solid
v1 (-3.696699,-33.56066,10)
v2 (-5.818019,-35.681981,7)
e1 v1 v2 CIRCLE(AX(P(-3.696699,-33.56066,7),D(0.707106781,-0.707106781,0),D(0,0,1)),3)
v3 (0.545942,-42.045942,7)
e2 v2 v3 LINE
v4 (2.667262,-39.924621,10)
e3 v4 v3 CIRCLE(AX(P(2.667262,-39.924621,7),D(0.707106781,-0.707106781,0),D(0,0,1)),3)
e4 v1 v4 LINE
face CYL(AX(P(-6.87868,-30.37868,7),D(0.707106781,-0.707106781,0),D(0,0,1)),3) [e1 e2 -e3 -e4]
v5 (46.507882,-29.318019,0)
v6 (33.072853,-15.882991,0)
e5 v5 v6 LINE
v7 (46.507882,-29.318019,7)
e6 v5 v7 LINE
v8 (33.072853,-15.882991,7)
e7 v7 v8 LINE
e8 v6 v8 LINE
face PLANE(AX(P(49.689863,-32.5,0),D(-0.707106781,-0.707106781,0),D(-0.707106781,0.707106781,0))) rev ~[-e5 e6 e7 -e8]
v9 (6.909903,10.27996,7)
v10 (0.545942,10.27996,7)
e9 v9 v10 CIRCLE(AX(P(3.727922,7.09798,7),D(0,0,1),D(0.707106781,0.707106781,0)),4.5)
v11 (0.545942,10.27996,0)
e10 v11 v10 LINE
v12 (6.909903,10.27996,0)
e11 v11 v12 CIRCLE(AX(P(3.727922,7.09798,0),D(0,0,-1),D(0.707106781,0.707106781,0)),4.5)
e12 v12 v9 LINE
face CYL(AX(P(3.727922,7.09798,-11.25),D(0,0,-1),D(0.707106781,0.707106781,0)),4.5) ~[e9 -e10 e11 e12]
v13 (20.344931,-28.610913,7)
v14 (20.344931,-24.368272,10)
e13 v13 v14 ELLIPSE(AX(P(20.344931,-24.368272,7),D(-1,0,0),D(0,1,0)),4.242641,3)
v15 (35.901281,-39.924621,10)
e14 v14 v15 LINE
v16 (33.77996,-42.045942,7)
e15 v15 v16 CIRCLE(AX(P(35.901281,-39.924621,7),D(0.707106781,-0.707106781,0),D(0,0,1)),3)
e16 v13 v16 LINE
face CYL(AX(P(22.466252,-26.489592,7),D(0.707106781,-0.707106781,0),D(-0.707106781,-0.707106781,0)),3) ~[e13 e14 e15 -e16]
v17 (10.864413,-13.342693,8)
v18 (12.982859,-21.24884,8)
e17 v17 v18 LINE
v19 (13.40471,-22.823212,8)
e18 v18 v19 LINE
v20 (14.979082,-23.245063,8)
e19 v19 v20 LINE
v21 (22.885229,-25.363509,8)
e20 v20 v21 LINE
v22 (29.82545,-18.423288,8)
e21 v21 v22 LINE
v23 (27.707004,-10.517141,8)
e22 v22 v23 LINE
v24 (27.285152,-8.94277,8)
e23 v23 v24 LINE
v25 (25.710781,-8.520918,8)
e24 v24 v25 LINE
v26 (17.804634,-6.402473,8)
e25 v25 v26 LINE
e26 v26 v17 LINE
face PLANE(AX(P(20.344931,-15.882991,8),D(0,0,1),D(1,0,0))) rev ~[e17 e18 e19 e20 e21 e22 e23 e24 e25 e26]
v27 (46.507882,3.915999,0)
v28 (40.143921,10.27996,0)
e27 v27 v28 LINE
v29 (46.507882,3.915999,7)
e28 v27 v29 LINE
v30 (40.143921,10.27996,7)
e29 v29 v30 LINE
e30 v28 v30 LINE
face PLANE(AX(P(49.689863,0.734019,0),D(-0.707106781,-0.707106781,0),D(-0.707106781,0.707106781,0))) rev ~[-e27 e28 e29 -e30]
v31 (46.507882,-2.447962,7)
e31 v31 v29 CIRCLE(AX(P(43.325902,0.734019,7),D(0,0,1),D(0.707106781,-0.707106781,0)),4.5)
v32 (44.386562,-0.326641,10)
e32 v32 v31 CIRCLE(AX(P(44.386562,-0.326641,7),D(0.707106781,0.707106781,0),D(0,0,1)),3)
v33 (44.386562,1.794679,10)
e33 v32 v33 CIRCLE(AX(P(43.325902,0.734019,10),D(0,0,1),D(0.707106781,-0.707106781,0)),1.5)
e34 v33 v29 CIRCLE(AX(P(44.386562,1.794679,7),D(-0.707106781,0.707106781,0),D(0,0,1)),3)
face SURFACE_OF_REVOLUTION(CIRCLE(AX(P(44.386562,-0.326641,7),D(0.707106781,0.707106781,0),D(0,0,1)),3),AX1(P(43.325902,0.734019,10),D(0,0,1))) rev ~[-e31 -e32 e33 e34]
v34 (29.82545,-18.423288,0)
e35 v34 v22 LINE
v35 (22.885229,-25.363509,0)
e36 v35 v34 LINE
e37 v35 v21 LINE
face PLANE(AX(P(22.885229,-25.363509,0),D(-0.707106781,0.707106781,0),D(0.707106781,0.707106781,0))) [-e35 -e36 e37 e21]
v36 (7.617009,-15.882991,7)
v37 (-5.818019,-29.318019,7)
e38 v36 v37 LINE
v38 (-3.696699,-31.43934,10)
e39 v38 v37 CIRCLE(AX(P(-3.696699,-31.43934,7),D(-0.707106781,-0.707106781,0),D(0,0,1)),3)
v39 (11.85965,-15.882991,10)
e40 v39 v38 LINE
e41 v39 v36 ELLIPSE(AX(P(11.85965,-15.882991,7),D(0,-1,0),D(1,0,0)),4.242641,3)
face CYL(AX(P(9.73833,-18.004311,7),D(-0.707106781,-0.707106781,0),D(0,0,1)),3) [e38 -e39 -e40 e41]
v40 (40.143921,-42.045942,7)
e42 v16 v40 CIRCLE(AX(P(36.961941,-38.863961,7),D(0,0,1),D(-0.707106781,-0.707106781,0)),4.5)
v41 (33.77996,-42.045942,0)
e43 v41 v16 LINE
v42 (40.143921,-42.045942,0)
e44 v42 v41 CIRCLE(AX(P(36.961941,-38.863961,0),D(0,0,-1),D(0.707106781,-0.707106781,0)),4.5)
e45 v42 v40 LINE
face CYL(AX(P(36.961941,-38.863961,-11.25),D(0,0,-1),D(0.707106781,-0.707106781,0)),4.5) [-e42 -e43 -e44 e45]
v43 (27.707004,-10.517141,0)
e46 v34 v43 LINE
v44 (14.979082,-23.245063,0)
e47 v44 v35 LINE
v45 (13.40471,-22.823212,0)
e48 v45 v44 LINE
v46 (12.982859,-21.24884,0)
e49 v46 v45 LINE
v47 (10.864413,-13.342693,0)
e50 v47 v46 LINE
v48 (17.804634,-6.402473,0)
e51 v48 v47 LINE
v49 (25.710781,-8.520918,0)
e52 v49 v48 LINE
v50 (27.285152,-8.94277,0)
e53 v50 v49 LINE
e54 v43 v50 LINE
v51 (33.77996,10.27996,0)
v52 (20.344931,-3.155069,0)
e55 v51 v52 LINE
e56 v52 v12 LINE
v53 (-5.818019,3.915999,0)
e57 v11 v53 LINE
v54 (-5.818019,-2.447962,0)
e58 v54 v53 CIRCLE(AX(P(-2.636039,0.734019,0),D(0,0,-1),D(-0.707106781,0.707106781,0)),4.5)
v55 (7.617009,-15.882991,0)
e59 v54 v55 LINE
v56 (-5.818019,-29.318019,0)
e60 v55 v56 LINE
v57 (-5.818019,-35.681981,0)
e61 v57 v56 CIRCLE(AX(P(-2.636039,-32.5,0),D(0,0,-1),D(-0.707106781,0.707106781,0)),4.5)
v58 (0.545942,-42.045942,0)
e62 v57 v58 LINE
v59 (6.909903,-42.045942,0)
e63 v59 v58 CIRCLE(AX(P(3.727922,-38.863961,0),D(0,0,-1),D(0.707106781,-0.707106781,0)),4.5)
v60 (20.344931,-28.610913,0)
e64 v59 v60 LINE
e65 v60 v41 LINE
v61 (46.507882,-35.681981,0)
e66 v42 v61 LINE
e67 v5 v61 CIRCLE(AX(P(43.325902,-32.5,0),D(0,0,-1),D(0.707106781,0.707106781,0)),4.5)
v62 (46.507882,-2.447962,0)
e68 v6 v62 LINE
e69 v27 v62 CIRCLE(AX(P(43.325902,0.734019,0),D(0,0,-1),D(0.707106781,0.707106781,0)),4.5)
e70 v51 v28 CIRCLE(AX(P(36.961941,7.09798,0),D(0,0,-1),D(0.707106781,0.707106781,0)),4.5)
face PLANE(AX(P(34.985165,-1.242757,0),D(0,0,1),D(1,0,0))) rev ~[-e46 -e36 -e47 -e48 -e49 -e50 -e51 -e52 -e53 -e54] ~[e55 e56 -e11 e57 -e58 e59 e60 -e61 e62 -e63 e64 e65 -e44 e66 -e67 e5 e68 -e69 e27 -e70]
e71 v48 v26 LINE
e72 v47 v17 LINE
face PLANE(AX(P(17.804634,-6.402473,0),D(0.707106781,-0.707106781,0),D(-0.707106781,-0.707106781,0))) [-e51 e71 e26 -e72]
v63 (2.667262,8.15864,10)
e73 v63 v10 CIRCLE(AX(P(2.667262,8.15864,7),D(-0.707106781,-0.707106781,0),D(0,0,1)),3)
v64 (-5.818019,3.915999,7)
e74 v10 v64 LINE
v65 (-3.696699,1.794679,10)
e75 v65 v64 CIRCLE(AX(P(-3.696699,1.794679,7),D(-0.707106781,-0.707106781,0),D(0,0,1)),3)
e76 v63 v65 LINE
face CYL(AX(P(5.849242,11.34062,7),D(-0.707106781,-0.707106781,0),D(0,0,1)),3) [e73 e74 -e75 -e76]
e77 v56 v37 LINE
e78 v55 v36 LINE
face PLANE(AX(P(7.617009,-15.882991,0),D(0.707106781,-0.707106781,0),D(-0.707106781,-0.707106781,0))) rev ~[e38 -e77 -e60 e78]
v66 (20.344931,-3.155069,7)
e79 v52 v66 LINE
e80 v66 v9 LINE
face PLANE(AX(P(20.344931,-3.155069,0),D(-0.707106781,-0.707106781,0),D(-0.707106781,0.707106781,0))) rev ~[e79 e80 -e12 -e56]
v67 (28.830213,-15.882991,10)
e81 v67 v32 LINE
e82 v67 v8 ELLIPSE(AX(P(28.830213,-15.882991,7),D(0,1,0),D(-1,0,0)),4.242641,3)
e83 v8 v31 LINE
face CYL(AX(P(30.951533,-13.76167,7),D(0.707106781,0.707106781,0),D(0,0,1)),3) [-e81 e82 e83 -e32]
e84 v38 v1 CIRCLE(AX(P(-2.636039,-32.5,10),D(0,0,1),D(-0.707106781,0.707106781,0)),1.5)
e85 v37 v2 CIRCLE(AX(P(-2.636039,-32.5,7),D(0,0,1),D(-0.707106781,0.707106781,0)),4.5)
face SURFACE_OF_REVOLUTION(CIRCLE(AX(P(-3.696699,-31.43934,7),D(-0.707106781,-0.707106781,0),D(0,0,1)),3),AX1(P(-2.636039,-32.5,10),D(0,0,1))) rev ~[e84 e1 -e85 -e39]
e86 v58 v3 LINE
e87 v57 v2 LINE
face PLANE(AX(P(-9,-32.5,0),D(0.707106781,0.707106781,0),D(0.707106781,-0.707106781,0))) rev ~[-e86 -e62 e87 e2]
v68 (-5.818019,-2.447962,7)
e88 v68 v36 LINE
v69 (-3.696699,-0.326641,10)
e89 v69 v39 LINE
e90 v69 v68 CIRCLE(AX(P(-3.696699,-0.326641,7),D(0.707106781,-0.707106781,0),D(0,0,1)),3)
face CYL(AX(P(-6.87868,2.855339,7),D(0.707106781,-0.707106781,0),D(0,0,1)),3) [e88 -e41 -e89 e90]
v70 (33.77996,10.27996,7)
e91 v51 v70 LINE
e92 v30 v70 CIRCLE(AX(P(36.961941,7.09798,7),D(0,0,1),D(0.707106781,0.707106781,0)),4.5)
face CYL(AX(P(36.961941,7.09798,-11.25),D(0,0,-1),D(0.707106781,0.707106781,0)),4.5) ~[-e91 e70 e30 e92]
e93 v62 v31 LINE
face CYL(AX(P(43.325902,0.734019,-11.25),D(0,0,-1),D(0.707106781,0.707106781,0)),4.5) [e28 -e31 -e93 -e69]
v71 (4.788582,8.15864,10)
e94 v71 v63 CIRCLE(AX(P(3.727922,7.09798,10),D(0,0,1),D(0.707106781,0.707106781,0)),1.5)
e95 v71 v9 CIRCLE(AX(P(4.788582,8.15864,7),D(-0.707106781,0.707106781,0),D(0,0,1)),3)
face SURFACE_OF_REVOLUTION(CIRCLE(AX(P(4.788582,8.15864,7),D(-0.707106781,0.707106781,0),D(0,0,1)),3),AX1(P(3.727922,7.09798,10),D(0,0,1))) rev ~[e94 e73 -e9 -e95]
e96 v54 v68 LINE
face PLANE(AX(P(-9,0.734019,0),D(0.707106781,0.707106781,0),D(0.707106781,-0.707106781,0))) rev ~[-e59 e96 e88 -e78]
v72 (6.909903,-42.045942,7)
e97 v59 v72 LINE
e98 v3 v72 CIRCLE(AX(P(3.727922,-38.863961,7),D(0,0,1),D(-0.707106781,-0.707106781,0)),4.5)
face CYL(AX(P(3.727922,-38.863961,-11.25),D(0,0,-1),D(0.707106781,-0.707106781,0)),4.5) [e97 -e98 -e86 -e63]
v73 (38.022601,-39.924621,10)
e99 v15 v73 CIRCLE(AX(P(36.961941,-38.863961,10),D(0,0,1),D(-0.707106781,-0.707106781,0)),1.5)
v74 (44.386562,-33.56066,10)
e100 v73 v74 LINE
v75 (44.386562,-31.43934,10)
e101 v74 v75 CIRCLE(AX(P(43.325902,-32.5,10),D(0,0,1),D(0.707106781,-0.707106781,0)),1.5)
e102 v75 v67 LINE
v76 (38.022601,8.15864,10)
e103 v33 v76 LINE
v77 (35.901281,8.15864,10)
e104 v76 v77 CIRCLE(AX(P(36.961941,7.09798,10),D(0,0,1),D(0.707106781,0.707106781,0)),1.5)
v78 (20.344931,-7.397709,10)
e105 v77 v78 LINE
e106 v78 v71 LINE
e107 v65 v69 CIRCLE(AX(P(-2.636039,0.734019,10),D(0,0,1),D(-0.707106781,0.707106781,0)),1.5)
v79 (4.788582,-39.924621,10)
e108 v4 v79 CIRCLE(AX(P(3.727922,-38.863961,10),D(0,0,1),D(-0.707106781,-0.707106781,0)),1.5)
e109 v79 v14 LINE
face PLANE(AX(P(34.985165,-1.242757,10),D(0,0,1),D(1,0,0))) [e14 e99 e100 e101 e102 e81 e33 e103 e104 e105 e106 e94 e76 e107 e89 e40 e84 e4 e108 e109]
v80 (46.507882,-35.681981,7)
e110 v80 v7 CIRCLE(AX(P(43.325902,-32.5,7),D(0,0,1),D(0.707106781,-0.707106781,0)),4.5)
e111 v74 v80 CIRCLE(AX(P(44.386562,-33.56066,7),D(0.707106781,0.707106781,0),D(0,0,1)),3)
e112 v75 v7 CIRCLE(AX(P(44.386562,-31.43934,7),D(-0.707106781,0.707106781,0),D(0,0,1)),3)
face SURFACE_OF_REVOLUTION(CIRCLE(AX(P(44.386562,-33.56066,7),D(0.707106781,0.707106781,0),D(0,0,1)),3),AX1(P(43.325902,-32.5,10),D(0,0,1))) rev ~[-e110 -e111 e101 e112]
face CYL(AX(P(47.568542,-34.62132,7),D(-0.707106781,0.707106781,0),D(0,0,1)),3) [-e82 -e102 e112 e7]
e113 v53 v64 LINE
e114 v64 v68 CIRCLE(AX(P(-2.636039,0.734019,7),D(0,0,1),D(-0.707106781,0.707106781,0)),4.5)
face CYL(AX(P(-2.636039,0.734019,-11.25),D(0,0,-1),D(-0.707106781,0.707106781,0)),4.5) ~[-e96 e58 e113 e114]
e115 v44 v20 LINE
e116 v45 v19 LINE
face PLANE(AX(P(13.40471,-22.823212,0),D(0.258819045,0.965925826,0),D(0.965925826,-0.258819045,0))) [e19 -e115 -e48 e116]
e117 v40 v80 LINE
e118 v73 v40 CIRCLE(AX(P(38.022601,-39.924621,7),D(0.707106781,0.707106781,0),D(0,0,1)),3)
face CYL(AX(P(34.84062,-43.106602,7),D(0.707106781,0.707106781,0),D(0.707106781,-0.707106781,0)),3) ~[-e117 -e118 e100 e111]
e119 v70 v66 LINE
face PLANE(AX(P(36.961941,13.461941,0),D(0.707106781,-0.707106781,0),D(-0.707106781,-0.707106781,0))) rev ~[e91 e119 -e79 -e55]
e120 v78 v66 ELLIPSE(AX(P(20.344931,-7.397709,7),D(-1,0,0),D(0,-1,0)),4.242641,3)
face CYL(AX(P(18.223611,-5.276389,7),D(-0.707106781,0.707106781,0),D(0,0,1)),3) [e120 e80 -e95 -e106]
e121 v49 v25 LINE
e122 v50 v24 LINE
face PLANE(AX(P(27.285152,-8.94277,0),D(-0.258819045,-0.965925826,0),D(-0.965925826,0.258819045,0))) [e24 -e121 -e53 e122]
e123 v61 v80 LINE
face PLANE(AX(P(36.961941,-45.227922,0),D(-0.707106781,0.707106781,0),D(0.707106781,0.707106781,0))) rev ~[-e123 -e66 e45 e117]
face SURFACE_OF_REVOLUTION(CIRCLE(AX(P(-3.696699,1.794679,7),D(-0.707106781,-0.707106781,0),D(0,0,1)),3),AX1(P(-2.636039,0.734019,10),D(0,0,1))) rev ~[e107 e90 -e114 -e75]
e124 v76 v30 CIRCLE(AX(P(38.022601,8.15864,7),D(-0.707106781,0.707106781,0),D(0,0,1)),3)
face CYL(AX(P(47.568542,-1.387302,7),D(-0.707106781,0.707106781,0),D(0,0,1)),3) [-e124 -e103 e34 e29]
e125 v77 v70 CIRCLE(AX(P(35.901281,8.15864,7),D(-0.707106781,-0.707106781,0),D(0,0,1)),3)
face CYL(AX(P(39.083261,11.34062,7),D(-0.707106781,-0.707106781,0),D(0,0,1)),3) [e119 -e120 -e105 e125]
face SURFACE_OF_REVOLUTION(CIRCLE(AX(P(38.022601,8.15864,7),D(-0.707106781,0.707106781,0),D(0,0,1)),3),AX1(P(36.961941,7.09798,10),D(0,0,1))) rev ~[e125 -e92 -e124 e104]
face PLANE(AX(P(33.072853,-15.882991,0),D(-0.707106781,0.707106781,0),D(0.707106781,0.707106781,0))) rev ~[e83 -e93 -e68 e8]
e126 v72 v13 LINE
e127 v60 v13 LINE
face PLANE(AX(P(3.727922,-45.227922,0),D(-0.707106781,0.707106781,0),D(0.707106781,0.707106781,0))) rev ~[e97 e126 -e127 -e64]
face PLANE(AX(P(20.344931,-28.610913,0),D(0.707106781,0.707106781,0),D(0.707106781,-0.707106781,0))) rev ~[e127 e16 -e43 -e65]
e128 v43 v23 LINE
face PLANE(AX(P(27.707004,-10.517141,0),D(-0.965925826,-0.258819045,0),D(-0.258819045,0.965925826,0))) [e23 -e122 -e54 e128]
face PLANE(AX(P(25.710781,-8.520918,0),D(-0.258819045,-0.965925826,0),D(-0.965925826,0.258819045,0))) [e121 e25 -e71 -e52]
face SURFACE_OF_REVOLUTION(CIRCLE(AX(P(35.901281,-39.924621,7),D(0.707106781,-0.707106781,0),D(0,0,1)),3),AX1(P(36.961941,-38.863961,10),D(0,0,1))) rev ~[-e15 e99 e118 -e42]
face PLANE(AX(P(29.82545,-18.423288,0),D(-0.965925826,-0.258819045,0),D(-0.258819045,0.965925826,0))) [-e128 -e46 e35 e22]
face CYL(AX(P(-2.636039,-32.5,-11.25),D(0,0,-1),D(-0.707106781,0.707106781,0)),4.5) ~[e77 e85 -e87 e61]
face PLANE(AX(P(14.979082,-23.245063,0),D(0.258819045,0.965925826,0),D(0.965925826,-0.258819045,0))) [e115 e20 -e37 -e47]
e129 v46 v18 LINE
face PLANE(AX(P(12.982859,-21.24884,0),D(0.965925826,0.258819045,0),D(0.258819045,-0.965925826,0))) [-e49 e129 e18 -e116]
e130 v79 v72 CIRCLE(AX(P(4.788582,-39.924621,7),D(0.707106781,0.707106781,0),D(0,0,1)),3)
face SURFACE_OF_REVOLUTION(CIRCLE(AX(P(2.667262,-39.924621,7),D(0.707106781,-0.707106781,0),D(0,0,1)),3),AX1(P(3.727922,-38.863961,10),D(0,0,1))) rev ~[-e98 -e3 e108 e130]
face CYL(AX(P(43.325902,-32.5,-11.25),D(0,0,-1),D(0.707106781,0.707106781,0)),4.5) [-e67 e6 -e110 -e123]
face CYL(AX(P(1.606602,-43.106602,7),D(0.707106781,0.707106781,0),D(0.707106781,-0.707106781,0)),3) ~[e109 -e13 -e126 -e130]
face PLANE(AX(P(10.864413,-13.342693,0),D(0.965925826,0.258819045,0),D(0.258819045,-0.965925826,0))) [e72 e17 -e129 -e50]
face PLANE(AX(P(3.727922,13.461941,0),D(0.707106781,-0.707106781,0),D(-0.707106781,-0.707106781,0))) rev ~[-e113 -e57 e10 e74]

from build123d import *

# Parameters (mm, degrees)
F1_DEPTH     = 10
F2_DEPTH     = 8
F3_R         = 3
F4_T1_DEPTH  = 21.25
F4_T4_ANGLE  = 90
F4_T6_ANGLE  = 90
F4_T8_ANGLE  = 90
F4_T10_ANGLE = 90
F4_T12_ANGLE = 90
F4_T14_ANGLE = 90
F4_T16_ANGLE = 90
F4_T18_ANGLE = 90


# Not quite as in the source:
# - a fillet or chamfer that OpenCascade refuses, or shapes differently, is made with other operations: its cross-section is extruded or revolved along the edge and cut away or added


with BuildPart() as f1:
    # F0 (on Top) → F1 (new body)
    with BuildSketch(Plane.XY):
        Polygon((25.7107810123, -8.5209181738), (27.2851523571, -8.9427697042), (27.7070038876, -10.5171410491), (33.0728534806, -15.8829906421), (49.6898628385, 0.7340187158), (36.9619407771, 13.4619407771), (20.3449314192, -3.1550685808), align=None)
        Polygon((33.0728534806, -15.8829906421), (27.7070038876, -10.5171410491), (29.8254495283, -18.4232878133), (22.8852285904, -25.3635087511), (14.9790818262, -23.2450631104), (20.3449314192, -28.6109127035), align=None)
        Polygon((17.8046342481, -6.4024725331), (25.7107810123, -8.5209181738), (20.3449314192, -3.1550685808), (7.6170093579, -15.8829906421), (12.9828589509, -21.2488402351), (10.8644133102, -13.342693471), align=None)
        Polygon((49.6898628385, -32.5), (33.0728534806, -15.8829906421), (20.3449314192, -28.6109127035), (36.9619407771, -45.2279220614), align=None)
        Polygon((7.6170093579, -15.8829906421), (20.3449314192, -3.1550685808), (3.7279220614, 13.4619407771), (-9, 0.7340187158), align=None)
        Polygon((3.7279220614, -45.2279220614), (20.3449314192, -28.6109127035), (14.9790818262, -23.2450631104), (13.4047104814, -22.82321158), (12.9828589509, -21.2488402351), (7.6170093579, -15.8829906421), (-9, -32.5), align=None)
        Polygon((29.8254495283, -18.4232878133), (27.7070038876, -10.5171410491), (25.7107810123, -8.5209181738), (17.8046342481, -6.4024725331), (10.8644133102, -13.342693471), (12.9828589509, -21.2488402351), (14.9790818262, -23.2450631104), (22.8852285904, -25.3635087511), align=None)
        Polygon((27.7070038876, -10.5171410491), (27.2851523571, -8.9427697042), (25.7107810123, -8.5209181738), align=None)
        Polygon((13.4047104814, -22.82321158), (14.9790818262, -23.2450631104), (12.9828589509, -21.2488402351), align=None)
    extrude(amount=F1_DEPTH)

    # F0 (on Top) → F2 (cut)
    with BuildSketch(Plane.XY):
        Polygon((29.8254495283, -18.4232878133), (27.7070038876, -10.5171410491), (25.7107810123, -8.5209181738), (17.8046342481, -6.4024725331), (10.8644133102, -13.342693471), (12.9828589509, -21.2488402351), (14.9790818262, -23.2450631104), (22.8852285904, -25.3635087511), align=None)
        Polygon((13.4047104814, -22.82321158), (14.9790818262, -23.2450631104), (12.9828589509, -21.2488402351), align=None)
        Polygon((27.7070038876, -10.5171410491), (27.2851523571, -8.9427697042), (25.7107810123, -8.5209181738), align=None)
    extrude(amount=F2_DEPTH, mode=Mode.SUBTRACT)

    # F3
    f3_edges = [f1.edges().sort_by_distance(p)[0] for p in [
        (43.325902, 7.09798, 10),
        (28.653436, 5.153436, 10),
        (12.036427, 5.153436, 10),
        (-2.636039, 7.09798, 10),
        (-0.691495, -7.574486, 10),
        (-0.691495, -24.191495, 10),
        (-2.636039, -38.863961, 10),
        (12.036427, -36.919417, 10),
        (28.653436, -36.919417, 10),
        (43.325902, -38.863961, 10),
        (41.381358, -24.191495, 10),
        (41.381358, -7.574486, 10),
    ]]
    fillet(f3_edges, radius=F3_R)

    # F4: fillet of radius 4.5 on 8 edges, made by hand

    # F4_s2 → F4_t1 (cut)
    with BuildSketch(Plane.XY.offset(-11.25)):
        with BuildLine():
            ThreePointArc((40.1439212925, 10.2799602618), (36.9619407771, 11.5979797464), (33.7799602618, 10.2799602618))
            Line((33.7799602618, 10.2799602618), (36.9619407771, 13.4619407771))
            Line((36.9619407771, 13.4619407771), (40.1439212925, 10.2799602618))
        make_face()
        with BuildLine():
            ThreePointArc((46.5078823231, 3.9159992311), (47.8259018078, 0.7340187158), (46.5078823231, -2.4479617996))
            Line((46.5078823231, -2.4479617996), (49.6898628385, 0.7340187158))
            Line((49.6898628385, 0.7340187158), (46.5078823231, 3.9159992311))
        make_face()
        with BuildLine():
            ThreePointArc((46.5078823231, -29.3180194847), (47.8259018078, -32.5), (46.5078823231, -35.6819805153))
            Line((46.5078823231, -35.6819805153), (49.6898628385, -32.5))
            Line((49.6898628385, -32.5), (46.5078823231, -29.3180194847))
        make_face()
        with BuildLine():
            ThreePointArc((40.1439212925, -42.045941546), (36.9619407771, -43.3639610307), (33.7799602618, -42.045941546))
            Line((33.7799602618, -42.045941546), (36.9619407771, -45.2279220614))
            Line((36.9619407771, -45.2279220614), (40.1439212925, -42.045941546))
        make_face()
        with BuildLine():
            ThreePointArc((6.9099025767, -42.045941546), (3.7279220614, -43.3639610307), (0.545941546, -42.045941546))
            Line((0.545941546, -42.045941546), (3.7279220614, -45.2279220614))
            Line((3.7279220614, -45.2279220614), (6.9099025767, -42.045941546))
        make_face()
        with BuildLine():
            ThreePointArc((-5.8180194847, -29.3180194847), (-7.1360389693, -32.5), (-5.8180194847, -35.6819805153))
            Line((-5.8180194847, -35.6819805153), (-9, -32.5))
            Line((-9, -32.5), (-5.8180194847, -29.3180194847))
        make_face()
        with BuildLine():
            ThreePointArc((-5.8180194847, 3.9159992311), (-7.1360389693, 0.7340187158), (-5.8180194847, -2.4479617996))
            Line((-5.8180194847, -2.4479617996), (-9, 0.7340187158))
            Line((-9, 0.7340187158), (-5.8180194847, 3.9159992311))
        make_face()
        with BuildLine():
            ThreePointArc((6.9099025767, 10.2799602618), (3.7279220614, 11.5979797464), (0.545941546, 10.2799602618))
            Line((0.545941546, 10.2799602618), (3.7279220614, 13.4619407771))
            Line((3.7279220614, 13.4619407771), (6.9099025767, 10.2799602618))
        make_face()
    extrude(amount=F4_T1_DEPTH, mode=Mode.SUBTRACT)

    # F4_s3 → F4_t4 (revolve, cut)
    with BuildSketch(Plane(origin=(-1.6850288425, 1.6850288425, 0), x_dir=(0, 0, 1), z_dir=(0.7071067812, -0.7071067812, 0))):
        with BuildLine():
            ThreePointArc((10, -9.1550685808), (9.1213203436, -11.2763889243), (7, -12.1550685808))
            Line((7, -12.1550685808), (10, -12.1550685808))
            Line((10, -12.1550685808), (10, -9.1550685808))
        make_face()
    revolve(axis=Axis((3.7279220614, 7.0979797464, 10), (0, 0, 1)), revolution_arc=F4_T4_ANGLE, mode=Mode.SUBTRACT)

    # F4_s5 → F4_t6 (revolve, cut)
    with BuildSketch(Plane(origin=(-0.9510101268, -0.9510101268, 0), x_dir=(0, 0, 1), z_dir=(0.7071067812, 0.7071067812, 0))):
        with BuildLine():
            ThreePointArc((10, -3.8829906421), (9.1213203436, -6.0043109857), (7, -6.8829906421))
            Line((7, -6.8829906421), (10, -6.8829906421))
            Line((10, -6.8829906421), (10, -3.8829906421))
        make_face()
    revolve(axis=Axis((-2.6360389693, 0.7340187158, 10), (0, 0, 1)), revolution_arc=F4_T6_ANGLE, mode=Mode.SUBTRACT)

    # F4_s7 → F4_t8 (revolve, cut)
    with BuildSketch(Plane(origin=(-17.5680194847, -17.5680194847, 0), x_dir=(0, 0, 1), z_dir=(0.7071067812, 0.7071067812, 0))):
        with BuildLine():
            ThreePointArc((10, 19.6170093579), (9.1213203436, 17.4956890143), (7, 16.6170093579))
            Line((7, 16.6170093579), (10, 16.6170093579))
            Line((10, 16.6170093579), (10, 19.6170093579))
        make_face()
    revolve(axis=Axis((-2.6360389693, -32.5, 10), (0, 0, 1)), revolution_arc=F4_T8_ANGLE, mode=Mode.SUBTRACT)

    # F4_s9 → F4_t10 (revolve, cut)
    with BuildSketch(Plane(origin=(21.295941546, -21.295941546, 0), x_dir=(0, 0, 1), z_dir=(-0.7071067812, 0.7071067812, 0))):
        with BuildLine():
            ThreePointArc((10, -26.3449314192), (9.1213203436, -28.4662517628), (7, -29.3449314192))
            Line((7, -29.3449314192), (10, -29.3449314192))
            Line((10, -29.3449314192), (10, -26.3449314192))
        make_face()
    revolve(axis=Axis((3.7279220614, -38.8639610307, 10), (0, 0, 1)), revolution_arc=F4_T10_ANGLE, mode=Mode.SUBTRACT)

    # F4_s11 → F4_t12 (revolve, cut)
    with BuildSketch(Plane(origin=(37.9129509039, -37.9129509039, 0), x_dir=(0, 0, 1), z_dir=(-0.7071067812, 0.7071067812, 0))):
        with BuildLine():
            ThreePointArc((10, -2.8449314192), (9.1213203436, -4.9662517628), (7, -5.8449314192))
            Line((7, -5.8449314192), (10, -5.8449314192))
            Line((10, -5.8449314192), (10, -2.8449314192))
        make_face()
    revolve(axis=Axis((36.9619407771, -38.8639610307, 10), (0, 0, 1)), revolution_arc=F4_T12_ANGLE, mode=Mode.SUBTRACT)

    # F4_s13 → F4_t14 (revolve, cut)
    with BuildSketch(Plane(origin=(5.4129509039, 5.4129509039, 0), x_dir=(0, 0, 1), z_dir=(-0.7071067812, -0.7071067812, 0))):
        with BuildLine():
            ThreePointArc((10, -55.1170093579), (9.1213203436, -57.2383297014), (7, -58.1170093579))
            Line((7, -58.1170093579), (10, -58.1170093579))
            Line((10, -58.1170093579), (10, -55.1170093579))
        make_face()
    revolve(axis=Axis((43.3259018078, -32.5, 10), (0, 0, 1)), revolution_arc=F4_T14_ANGLE, mode=Mode.SUBTRACT)

    # F4_s15 → F4_t16 (revolve, cut)
    with BuildSketch(Plane(origin=(22.0299602618, 22.0299602618, 0), x_dir=(0, 0, 1), z_dir=(-0.7071067812, -0.7071067812, 0))):
        with BuildLine():
            ThreePointArc((10, -31.6170093579), (9.1213203436, -33.7383297014), (7, -34.6170093579))
            Line((7, -34.6170093579), (10, -34.6170093579))
            Line((10, -34.6170093579), (10, -31.6170093579))
        make_face()
    revolve(axis=Axis((43.3259018078, 0.7340187158, 10), (0, 0, 1)), revolution_arc=F4_T16_ANGLE, mode=Mode.SUBTRACT)

    # F4_s17 → F4_t18 (revolve, cut)
    with BuildSketch(Plane(origin=(14.9319805153, -14.9319805153, 0), x_dir=(0, 0, 1), z_dir=(0.7071067812, -0.7071067812, 0))):
        with BuildLine():
            ThreePointArc((10, -32.6550685808), (9.1213203436, -34.7763889243), (7, -35.6550685808))
            Line((7, -35.6550685808), (10, -35.6550685808))
            Line((10, -35.6550685808), (10, -32.6550685808))
        make_face()
    revolve(axis=Axis((36.9619407771, 7.0979797464, 10), (0, 0, 1)), revolution_arc=F4_T18_ANGLE, mode=Mode.SUBTRACT)


solid = f1.part
